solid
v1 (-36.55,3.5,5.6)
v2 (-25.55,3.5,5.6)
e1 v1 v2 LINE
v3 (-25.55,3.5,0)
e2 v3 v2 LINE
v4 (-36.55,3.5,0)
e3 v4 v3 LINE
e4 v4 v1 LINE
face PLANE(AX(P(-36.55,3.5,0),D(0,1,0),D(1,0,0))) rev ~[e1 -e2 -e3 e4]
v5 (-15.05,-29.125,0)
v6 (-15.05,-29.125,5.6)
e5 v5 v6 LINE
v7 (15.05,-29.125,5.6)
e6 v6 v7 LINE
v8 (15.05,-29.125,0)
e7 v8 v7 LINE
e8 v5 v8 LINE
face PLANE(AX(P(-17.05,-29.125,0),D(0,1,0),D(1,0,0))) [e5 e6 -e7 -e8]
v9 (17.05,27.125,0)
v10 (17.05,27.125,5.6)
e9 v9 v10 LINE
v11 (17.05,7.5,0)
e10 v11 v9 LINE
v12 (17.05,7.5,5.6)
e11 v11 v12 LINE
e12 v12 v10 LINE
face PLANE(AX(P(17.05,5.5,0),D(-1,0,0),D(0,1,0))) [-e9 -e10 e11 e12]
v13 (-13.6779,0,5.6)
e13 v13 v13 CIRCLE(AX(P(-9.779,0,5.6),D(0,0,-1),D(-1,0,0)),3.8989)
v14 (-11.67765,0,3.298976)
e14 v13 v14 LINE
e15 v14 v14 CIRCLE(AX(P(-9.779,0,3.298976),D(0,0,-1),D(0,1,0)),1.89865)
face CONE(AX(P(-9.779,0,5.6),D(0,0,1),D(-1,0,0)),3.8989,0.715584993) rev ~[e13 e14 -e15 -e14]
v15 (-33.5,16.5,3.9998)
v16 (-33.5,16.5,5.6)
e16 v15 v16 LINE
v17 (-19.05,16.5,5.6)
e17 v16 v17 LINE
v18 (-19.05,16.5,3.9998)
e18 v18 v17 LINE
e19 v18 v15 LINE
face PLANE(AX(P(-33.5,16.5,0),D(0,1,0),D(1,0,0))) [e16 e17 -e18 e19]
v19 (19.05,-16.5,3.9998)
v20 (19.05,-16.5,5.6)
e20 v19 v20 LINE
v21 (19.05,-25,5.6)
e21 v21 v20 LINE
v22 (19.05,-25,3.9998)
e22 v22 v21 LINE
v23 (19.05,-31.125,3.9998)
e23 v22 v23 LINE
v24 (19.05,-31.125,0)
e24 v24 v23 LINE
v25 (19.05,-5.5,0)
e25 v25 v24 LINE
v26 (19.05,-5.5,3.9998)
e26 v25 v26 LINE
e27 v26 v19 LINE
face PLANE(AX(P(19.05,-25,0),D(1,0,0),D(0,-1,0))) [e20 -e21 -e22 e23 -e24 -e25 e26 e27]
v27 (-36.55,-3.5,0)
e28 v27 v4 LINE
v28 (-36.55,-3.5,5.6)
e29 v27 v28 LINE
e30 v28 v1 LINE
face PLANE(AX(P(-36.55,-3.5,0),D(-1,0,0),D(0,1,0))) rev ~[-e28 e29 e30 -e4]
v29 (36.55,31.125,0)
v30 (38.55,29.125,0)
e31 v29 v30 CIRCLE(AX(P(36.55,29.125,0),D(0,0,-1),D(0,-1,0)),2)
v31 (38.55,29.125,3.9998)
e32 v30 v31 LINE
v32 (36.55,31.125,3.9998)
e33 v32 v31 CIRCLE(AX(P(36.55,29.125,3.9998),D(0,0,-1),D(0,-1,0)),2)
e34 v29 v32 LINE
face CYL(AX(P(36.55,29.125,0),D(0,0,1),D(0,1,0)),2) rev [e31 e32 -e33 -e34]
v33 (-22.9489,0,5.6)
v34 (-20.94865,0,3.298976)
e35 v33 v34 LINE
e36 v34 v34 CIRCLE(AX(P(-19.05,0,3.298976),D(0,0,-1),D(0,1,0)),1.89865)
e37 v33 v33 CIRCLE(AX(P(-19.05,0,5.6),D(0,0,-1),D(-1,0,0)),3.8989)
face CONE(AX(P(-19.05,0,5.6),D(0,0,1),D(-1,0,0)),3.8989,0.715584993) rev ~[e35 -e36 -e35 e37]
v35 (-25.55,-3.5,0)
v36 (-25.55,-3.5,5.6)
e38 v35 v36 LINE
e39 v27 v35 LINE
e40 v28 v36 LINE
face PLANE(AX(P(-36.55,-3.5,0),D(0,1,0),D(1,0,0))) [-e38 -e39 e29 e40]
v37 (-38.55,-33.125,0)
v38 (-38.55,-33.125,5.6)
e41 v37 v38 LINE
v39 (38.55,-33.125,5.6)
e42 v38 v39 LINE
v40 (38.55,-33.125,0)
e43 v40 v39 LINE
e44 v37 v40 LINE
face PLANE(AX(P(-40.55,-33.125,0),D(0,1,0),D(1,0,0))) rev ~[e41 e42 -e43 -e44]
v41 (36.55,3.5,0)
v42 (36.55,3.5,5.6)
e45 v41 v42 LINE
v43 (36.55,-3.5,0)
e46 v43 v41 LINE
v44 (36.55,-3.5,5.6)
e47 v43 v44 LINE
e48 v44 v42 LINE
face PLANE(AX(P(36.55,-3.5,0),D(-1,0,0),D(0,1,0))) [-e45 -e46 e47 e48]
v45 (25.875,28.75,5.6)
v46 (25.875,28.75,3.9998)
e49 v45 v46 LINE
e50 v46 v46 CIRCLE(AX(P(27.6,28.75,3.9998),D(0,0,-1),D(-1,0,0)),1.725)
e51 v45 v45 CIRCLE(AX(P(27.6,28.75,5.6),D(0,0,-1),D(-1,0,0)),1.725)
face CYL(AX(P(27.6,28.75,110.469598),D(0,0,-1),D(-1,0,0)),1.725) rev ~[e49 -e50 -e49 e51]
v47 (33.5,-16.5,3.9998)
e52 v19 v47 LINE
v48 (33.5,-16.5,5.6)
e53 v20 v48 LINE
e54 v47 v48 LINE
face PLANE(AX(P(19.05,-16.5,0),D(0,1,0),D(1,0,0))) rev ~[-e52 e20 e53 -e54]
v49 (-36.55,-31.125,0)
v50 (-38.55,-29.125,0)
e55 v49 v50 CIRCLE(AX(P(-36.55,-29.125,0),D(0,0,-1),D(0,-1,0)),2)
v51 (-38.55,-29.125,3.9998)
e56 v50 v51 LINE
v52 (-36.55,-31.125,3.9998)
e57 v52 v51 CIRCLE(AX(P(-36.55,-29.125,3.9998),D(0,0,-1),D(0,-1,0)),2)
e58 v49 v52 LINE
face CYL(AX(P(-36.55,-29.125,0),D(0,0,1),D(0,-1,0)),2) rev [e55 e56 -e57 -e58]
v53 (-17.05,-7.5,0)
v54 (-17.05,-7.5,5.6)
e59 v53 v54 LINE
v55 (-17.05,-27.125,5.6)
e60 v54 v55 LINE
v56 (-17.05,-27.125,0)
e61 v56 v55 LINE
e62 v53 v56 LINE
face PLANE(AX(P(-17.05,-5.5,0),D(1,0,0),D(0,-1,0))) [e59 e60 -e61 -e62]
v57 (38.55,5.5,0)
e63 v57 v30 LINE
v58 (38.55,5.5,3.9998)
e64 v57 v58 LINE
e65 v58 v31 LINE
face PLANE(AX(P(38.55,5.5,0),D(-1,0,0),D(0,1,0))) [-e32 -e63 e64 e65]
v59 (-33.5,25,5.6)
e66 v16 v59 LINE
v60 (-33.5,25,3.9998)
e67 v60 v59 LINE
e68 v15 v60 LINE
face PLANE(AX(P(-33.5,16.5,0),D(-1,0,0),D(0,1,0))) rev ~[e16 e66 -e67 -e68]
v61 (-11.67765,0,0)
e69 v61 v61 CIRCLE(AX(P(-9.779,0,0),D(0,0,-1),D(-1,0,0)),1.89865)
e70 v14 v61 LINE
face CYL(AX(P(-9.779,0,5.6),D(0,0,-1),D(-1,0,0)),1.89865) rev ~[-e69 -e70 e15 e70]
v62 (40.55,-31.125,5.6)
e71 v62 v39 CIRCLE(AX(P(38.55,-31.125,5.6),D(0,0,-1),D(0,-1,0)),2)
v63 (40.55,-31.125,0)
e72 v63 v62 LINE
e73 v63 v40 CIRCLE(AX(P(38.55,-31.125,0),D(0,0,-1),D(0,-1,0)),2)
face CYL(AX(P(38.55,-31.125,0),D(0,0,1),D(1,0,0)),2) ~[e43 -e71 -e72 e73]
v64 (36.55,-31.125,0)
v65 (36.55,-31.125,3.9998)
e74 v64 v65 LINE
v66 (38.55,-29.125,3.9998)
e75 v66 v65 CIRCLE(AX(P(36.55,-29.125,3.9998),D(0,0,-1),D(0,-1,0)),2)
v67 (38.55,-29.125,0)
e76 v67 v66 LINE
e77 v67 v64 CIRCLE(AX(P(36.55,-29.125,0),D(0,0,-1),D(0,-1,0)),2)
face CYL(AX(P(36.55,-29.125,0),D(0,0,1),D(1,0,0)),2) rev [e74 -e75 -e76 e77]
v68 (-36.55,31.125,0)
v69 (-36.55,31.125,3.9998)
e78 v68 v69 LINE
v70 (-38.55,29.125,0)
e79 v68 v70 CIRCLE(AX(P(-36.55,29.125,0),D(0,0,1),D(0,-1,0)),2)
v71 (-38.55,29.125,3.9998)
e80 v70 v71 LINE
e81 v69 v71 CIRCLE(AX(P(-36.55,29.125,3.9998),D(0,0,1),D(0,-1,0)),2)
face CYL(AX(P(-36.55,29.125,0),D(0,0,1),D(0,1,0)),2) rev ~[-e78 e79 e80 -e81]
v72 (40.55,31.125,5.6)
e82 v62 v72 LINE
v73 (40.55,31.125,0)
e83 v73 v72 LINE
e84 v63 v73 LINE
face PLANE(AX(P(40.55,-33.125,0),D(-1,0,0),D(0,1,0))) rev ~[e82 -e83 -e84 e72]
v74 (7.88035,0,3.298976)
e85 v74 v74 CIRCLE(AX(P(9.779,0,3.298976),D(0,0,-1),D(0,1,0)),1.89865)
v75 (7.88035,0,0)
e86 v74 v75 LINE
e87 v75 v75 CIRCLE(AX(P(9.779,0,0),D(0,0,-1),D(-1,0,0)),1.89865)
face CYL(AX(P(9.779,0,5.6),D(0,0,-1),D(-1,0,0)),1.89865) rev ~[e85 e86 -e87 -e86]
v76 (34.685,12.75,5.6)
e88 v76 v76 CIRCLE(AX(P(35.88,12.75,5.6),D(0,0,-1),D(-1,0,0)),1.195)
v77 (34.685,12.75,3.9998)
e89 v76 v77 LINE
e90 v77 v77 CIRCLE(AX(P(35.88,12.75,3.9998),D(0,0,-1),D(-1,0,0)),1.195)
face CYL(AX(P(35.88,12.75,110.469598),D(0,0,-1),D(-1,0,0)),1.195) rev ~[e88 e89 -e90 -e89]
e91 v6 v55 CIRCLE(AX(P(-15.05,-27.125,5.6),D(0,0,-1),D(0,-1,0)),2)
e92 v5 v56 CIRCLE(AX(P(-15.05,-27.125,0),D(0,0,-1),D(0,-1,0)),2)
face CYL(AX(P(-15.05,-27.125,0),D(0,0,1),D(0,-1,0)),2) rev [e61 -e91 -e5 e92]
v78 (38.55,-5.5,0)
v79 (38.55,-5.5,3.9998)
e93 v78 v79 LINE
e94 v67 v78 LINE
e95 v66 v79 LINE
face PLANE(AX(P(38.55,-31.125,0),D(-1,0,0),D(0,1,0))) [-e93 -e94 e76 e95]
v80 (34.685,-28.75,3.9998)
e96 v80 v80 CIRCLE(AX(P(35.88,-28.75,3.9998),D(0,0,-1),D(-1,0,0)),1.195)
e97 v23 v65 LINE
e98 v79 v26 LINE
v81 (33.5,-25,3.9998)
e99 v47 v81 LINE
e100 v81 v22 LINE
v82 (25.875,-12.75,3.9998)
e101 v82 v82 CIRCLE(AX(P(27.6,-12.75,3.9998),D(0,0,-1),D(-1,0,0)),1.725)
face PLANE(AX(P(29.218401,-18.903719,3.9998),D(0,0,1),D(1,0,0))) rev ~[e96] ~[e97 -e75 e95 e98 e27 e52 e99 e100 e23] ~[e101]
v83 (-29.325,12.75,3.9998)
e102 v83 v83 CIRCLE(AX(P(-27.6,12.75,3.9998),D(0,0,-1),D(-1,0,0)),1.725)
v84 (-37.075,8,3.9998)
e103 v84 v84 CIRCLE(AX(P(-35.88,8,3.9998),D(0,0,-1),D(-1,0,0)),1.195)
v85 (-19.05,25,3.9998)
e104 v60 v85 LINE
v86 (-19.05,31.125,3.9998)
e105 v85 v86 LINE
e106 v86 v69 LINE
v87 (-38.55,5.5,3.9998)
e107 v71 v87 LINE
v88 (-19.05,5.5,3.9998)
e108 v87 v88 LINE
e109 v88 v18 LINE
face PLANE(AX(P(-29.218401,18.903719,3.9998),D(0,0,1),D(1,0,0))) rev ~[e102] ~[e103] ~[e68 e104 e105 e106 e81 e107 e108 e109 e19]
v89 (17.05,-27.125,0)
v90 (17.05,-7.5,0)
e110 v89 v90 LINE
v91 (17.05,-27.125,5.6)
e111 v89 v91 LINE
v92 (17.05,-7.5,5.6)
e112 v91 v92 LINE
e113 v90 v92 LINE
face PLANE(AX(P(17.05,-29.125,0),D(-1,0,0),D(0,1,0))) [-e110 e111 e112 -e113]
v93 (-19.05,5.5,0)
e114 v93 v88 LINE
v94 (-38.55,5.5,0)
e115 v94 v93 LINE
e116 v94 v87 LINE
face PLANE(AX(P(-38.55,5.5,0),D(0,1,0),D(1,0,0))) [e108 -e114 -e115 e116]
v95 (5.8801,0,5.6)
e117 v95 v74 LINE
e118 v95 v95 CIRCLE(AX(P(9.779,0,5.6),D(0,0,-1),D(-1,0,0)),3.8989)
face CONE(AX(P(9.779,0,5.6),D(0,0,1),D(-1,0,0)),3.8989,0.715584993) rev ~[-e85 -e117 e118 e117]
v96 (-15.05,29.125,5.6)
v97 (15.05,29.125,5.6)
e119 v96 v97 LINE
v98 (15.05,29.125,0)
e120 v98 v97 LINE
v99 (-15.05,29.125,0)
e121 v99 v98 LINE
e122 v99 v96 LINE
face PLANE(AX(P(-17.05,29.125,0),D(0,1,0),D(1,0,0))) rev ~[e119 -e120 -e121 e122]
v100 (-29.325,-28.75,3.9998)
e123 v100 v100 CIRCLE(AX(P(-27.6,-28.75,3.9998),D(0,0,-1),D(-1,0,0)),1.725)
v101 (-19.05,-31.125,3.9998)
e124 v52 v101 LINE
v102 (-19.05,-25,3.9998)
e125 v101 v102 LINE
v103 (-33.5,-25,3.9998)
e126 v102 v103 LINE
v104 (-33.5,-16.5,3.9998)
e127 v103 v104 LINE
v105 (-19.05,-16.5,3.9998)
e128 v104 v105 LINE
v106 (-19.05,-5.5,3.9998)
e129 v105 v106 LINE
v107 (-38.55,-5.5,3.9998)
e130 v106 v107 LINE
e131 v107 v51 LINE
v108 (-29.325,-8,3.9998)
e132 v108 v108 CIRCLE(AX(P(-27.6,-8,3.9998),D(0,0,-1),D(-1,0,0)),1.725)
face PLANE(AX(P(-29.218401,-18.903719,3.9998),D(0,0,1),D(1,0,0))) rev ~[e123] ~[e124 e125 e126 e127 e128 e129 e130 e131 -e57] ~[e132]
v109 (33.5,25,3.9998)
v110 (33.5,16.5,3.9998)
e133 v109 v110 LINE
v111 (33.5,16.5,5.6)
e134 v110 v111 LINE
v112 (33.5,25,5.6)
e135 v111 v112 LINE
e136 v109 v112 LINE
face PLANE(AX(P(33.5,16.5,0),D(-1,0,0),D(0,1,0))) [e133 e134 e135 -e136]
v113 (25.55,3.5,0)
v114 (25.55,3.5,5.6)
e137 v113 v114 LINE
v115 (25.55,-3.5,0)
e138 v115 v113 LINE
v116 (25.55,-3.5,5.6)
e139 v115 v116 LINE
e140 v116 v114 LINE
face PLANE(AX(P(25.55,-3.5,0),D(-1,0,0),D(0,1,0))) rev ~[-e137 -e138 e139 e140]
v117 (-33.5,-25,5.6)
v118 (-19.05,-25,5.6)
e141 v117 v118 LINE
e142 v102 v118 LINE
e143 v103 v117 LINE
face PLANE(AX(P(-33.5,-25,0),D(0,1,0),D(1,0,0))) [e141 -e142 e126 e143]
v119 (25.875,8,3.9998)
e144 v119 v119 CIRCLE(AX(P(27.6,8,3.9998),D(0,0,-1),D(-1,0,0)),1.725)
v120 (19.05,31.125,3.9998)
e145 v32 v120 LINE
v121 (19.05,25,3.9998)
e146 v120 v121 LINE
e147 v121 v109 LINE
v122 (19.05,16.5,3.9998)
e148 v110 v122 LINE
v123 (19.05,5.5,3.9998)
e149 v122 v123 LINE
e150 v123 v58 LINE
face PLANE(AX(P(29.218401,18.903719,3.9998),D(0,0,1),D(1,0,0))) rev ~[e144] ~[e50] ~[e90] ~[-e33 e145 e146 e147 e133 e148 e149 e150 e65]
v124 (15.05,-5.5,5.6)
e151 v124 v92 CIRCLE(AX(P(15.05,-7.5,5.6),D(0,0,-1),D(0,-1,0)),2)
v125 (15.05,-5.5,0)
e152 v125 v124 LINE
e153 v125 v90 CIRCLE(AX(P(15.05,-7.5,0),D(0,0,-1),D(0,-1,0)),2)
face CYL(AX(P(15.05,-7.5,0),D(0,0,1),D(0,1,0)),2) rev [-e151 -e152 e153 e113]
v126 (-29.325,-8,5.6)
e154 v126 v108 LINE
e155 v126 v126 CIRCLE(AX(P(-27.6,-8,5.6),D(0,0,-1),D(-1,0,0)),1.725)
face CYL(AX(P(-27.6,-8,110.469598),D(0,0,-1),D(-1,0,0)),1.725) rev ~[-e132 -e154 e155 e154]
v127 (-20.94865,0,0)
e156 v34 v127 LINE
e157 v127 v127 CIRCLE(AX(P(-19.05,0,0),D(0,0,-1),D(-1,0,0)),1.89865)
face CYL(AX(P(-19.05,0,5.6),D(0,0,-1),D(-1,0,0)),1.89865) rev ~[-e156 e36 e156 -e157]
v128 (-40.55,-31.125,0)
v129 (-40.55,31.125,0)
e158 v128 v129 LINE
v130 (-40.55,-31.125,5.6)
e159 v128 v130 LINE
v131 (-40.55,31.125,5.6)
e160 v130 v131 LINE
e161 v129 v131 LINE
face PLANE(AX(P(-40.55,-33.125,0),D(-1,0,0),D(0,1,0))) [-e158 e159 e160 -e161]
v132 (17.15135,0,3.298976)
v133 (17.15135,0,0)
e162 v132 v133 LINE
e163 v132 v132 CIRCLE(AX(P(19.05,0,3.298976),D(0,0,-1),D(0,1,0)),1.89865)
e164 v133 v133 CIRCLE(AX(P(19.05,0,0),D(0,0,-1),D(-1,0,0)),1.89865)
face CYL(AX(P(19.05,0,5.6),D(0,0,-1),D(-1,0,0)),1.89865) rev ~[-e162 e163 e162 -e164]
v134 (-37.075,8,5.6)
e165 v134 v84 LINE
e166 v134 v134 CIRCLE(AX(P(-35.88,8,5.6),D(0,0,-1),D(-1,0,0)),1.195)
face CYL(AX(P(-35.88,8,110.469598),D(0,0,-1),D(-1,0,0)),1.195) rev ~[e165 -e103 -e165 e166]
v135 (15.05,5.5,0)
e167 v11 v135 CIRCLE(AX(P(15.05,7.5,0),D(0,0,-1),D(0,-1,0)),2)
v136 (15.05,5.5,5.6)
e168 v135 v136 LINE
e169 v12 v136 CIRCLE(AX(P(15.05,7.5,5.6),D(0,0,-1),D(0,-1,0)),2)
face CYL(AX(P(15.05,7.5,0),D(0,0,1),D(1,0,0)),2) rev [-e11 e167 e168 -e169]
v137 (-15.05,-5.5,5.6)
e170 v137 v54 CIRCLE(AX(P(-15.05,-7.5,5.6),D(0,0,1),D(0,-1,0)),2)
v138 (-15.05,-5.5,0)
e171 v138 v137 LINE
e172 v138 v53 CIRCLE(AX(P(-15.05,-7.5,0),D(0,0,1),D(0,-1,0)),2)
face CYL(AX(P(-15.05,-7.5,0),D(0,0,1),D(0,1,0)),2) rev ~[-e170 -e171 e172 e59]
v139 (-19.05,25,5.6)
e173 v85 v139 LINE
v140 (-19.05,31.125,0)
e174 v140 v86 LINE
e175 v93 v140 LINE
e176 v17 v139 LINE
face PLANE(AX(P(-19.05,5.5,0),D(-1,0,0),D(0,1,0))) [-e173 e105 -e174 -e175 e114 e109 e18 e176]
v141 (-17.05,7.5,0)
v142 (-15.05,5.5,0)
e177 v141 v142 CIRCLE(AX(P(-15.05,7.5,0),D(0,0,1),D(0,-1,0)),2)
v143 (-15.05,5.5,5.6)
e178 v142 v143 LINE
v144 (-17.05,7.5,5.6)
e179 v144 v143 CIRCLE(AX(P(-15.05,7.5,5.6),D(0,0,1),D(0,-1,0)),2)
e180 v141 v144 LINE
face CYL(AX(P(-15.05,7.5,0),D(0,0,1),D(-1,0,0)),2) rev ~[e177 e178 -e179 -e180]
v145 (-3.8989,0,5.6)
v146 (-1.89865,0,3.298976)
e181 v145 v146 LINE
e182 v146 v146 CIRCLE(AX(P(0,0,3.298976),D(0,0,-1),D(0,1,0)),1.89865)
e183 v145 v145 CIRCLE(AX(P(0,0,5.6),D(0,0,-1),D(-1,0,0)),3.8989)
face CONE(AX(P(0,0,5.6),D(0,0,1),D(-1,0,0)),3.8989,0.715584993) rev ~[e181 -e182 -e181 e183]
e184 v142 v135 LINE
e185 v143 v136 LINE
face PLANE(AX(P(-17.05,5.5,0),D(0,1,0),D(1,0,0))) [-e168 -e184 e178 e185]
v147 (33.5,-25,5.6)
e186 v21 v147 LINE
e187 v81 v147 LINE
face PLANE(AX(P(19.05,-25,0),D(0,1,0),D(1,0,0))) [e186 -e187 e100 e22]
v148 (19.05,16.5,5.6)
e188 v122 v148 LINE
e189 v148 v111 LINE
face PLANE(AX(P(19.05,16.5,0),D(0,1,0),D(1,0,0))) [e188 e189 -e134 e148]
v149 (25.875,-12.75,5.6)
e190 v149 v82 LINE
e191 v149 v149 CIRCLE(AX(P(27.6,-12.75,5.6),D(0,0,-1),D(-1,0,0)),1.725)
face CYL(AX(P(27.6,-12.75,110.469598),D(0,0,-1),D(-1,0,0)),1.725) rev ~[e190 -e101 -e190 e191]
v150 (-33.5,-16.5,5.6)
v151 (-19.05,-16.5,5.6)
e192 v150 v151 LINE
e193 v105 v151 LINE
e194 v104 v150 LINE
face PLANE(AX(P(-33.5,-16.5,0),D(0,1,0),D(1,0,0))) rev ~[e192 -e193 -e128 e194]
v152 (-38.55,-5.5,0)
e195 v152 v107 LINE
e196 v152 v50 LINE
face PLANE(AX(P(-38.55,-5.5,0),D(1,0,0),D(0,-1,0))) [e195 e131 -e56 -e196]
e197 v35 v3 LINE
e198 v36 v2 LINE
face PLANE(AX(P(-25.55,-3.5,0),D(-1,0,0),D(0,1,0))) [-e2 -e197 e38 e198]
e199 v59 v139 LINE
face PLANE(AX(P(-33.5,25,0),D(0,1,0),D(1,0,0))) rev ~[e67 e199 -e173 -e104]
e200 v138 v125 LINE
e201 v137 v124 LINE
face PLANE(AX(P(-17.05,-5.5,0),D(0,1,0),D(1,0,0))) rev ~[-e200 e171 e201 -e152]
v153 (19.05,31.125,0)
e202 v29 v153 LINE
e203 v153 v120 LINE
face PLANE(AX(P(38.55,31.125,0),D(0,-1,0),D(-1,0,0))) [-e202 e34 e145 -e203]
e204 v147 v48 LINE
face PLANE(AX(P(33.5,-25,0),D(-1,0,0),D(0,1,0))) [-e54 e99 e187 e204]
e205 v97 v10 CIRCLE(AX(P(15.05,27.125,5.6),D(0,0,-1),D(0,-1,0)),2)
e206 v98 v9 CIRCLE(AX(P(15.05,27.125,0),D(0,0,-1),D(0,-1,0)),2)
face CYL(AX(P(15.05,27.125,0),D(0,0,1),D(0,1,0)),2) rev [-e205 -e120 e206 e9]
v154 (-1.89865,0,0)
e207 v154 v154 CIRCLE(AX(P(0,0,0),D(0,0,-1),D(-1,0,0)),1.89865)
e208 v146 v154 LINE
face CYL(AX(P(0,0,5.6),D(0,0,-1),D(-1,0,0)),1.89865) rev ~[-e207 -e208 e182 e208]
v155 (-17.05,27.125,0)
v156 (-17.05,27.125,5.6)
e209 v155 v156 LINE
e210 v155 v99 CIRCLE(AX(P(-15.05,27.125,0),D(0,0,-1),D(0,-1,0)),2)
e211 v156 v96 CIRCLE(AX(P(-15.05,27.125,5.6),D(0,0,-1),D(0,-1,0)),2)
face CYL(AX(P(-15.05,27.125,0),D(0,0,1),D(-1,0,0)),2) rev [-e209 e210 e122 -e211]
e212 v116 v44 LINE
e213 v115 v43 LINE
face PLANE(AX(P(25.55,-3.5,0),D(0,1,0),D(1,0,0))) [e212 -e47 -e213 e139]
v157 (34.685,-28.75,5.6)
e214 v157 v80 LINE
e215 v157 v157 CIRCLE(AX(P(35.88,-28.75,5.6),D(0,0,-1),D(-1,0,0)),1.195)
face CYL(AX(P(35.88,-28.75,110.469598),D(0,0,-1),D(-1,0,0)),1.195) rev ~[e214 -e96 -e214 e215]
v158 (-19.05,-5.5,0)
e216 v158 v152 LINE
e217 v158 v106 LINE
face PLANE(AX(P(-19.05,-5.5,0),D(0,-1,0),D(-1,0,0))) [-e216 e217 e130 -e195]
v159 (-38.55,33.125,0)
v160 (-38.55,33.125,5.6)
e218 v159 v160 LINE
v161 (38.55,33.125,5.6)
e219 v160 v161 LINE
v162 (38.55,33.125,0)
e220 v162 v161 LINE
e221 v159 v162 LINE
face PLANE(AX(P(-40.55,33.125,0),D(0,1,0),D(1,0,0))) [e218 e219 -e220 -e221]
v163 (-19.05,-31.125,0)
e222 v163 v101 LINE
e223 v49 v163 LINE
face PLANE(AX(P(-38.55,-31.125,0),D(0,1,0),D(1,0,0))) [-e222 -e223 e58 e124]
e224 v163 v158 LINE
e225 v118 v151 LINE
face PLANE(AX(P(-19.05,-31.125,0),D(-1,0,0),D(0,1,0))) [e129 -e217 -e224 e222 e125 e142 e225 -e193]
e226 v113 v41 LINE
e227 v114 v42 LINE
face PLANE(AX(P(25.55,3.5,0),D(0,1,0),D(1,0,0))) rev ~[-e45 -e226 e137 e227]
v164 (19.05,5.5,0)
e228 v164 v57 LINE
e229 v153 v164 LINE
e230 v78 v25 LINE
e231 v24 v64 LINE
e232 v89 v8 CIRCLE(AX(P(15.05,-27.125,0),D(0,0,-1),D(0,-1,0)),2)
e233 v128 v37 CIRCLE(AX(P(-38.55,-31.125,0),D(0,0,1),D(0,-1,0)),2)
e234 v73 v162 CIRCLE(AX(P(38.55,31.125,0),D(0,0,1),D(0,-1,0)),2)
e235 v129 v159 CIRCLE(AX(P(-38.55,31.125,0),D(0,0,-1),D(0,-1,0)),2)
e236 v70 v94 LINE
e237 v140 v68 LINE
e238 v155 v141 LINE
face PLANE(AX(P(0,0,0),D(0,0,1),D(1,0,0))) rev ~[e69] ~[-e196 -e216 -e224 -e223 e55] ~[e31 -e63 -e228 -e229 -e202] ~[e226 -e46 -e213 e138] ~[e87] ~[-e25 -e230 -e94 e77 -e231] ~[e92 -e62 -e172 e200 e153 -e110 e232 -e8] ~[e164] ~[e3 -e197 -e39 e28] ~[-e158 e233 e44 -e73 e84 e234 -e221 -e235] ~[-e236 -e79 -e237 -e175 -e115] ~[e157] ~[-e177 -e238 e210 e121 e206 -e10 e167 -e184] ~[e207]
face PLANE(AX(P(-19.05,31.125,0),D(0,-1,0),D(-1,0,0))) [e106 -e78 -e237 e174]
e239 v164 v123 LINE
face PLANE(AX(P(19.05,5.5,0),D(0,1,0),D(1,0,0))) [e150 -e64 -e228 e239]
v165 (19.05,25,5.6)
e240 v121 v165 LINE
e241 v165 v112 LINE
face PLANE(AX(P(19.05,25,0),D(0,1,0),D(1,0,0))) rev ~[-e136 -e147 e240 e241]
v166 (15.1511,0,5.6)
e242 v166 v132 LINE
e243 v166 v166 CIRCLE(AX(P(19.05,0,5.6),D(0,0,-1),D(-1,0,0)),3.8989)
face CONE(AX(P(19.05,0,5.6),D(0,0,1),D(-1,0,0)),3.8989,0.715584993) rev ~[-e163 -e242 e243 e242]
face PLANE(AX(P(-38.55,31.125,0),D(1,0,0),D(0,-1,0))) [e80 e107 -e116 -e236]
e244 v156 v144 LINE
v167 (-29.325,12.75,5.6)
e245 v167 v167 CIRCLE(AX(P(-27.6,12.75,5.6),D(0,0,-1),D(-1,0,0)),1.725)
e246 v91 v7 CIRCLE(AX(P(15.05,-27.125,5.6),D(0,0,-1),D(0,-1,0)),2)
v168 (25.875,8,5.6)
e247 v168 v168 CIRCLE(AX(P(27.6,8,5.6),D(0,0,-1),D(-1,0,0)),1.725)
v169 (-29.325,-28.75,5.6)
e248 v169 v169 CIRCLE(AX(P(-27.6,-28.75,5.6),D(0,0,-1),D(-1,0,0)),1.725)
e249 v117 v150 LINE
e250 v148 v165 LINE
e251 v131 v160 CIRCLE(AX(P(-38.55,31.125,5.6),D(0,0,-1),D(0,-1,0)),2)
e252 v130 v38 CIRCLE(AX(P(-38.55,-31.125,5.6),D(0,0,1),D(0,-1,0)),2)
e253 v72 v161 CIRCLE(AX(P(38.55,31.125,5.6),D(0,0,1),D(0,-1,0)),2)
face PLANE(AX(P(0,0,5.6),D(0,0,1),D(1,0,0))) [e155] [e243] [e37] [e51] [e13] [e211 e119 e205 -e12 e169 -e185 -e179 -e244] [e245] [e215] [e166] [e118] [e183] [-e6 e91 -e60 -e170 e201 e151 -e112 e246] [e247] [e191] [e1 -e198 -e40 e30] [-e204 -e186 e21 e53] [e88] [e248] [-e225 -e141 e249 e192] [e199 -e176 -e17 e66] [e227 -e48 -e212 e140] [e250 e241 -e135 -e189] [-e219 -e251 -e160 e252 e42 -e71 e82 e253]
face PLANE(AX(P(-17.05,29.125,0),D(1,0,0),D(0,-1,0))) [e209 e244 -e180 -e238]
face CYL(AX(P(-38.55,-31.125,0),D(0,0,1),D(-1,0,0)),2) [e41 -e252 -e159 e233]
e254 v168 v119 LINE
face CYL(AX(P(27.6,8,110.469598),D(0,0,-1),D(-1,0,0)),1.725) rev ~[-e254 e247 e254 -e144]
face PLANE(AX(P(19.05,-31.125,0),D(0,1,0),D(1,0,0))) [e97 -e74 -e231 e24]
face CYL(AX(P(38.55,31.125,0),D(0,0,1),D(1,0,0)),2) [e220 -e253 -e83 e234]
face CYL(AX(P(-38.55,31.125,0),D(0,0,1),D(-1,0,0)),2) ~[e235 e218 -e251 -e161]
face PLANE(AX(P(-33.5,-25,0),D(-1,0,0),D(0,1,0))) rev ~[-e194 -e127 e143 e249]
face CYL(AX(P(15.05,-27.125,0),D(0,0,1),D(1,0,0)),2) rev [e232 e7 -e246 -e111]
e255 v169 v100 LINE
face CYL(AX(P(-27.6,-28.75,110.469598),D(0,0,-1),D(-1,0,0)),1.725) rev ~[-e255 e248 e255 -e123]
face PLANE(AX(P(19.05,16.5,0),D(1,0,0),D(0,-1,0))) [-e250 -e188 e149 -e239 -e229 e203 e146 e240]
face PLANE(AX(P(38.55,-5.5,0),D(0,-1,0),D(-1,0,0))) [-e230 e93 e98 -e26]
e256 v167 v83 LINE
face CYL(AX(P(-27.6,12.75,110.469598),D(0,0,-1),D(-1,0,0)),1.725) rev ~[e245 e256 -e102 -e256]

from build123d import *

# Parameters (mm, degrees)
F0_W           = 81.1
F0_H           = 66.25
F1_DEPTH       = 5.6
F3_D           = 3.45
F4_D           = 2.39
F6_D           = 3.7973
F6_CSINK_D     = 7.7978
F6_CSINK_ANGLE = 82
F8_DEPTH       = 3.9998
F7_W           = 34.1
F7_H           = 8.5
F7_W_2         = 14.45
F7_H_2         = 11
F7_W_3         = 11
F7_H_3         = 7
F7_H_4         = 4.125
F9_DEPTH       = 5.6
F10_R          = 2


with BuildPart() as f1:
    # F0 (on Top) → F1 (new body)
    with BuildSketch(Plane.XY):
        Rectangle(F0_W, F0_H)
    extrude(amount=F1_DEPTH)

    # F3 (through all)
    with Locations(Plane.XY.offset(5.6)):
        with Locations((-27.6, 12.75), (27.6, 28.75), (-27.6, -8), (27.6, 8), (27.6, -12.75), (-27.6, -28.75)):
            Hole(F3_D / 2)

    # F4 (through all)
    with Locations(Plane.XY.offset(5.6)):
        with Locations((-35.88, 8), (35.88, 12.75), (35.88, -28.75)):
            Hole(F4_D / 2)

    # F6 (through all)
    with Locations(Plane.XY.offset(5.6)):
        with Locations((0, 0), (-9.779, 0), (9.779, 0), (19.05, 0), (-19.05, 0)):
            CounterSinkHole(F6_D / 2, F6_CSINK_D / 2, counter_sink_angle=F6_CSINK_ANGLE)

    # F7 (on face) → F8 (cut, through all)
    with BuildSketch(Plane.XY):
        Polygon((-38.55, -5.5), (-38.55, -31.125), (-19.05, -31.125), (-19.05, -25), (-33.5, -25), (-33.5, -16.5), (-19.05, -16.5), (-19.05, -5.5), align=None)
        Polygon((-38.55, 31.125), (-38.55, 5.5), (-19.05, 5.5), (-19.05, 16.5), (-33.5, 16.5), (-33.5, 25), (-19.05, 25), (-19.05, 31.125), align=None)
        Polygon((19.05, 16.5), (19.05, 5.5), (38.55, 5.5), (38.55, 31.125), (19.05, 31.125), (19.05, 25), (33.5, 25), (33.5, 16.5), align=None)
        Polygon((19.05, -25), (19.05, -31.125), (38.55, -31.125), (38.55, -5.5), (19.05, -5.5), (19.05, -16.5), (33.5, -16.5), (33.5, -25), align=None)
    extrude(amount=F8_DEPTH, mode=Mode.SUBTRACT)

    # F7 (on face) → F9 (cut, through all)
    with BuildSketch(Plane.XY):
        with Locations((0, -20.75)):
            Rectangle(F7_W, F7_H)
        with Locations((0, 20.75)):
            Rectangle(F7_W, F7_H)
        with Locations((-26.275, -20.75)):
            Rectangle(F7_W_2, F7_H)
        with Locations((26.275, -20.75)):
            Rectangle(F7_W_2, F7_H)
        with Locations((26.275, 20.75)):
            Rectangle(F7_W_2, F7_H)
        with Locations((-26.275, 20.75)):
            Rectangle(F7_W_2, F7_H)
        with Locations((0, 11)):
            Rectangle(F7_W, F7_H_2)
        with Locations((0, -11)):
            Rectangle(F7_W, F7_H_2)
        with Locations((-31.05, 0)):
            Rectangle(F7_W_3, F7_H_3)
        with Locations((31.05, 0)):
            Rectangle(F7_W_3, F7_H_3)
        with Locations((0, 27.0625)):
            Rectangle(F7_W, F7_H_4)
        with Locations((0, -27.0625)):
            Rectangle(F7_W, F7_H_4)
    extrude(amount=F9_DEPTH, mode=Mode.SUBTRACT)

    # F10
    f10_edges = [f1.edges().sort_by_distance(p)[0] for p in [
        (-40.55, 33.125, 2.8),
        (40.55, 33.125, 2.8),
        (40.55, -33.125, 2.8),
        (-40.55, -33.125, 2.8),
        (-17.05, 5.5, 2.8),
        (17.05, 5.5, 2.8),
        (-17.05, -5.5, 2.8),
        (17.05, -5.5, 2.8),
        (38.55, 31.125, 1.9999),
        (38.55, -31.125, 1.9999),
        (-38.55, 31.125, 1.9999),
        (-38.55, -31.125, 1.9999),
        (-17.05, 29.125, 2.8),
        (17.05, 29.125, 2.8),
        (17.05, -29.125, 2.8),
        (-17.05, -29.125, 2.8),
    ]]
    fillet(f10_edges, radius=F10_R)


solid = f1.part
